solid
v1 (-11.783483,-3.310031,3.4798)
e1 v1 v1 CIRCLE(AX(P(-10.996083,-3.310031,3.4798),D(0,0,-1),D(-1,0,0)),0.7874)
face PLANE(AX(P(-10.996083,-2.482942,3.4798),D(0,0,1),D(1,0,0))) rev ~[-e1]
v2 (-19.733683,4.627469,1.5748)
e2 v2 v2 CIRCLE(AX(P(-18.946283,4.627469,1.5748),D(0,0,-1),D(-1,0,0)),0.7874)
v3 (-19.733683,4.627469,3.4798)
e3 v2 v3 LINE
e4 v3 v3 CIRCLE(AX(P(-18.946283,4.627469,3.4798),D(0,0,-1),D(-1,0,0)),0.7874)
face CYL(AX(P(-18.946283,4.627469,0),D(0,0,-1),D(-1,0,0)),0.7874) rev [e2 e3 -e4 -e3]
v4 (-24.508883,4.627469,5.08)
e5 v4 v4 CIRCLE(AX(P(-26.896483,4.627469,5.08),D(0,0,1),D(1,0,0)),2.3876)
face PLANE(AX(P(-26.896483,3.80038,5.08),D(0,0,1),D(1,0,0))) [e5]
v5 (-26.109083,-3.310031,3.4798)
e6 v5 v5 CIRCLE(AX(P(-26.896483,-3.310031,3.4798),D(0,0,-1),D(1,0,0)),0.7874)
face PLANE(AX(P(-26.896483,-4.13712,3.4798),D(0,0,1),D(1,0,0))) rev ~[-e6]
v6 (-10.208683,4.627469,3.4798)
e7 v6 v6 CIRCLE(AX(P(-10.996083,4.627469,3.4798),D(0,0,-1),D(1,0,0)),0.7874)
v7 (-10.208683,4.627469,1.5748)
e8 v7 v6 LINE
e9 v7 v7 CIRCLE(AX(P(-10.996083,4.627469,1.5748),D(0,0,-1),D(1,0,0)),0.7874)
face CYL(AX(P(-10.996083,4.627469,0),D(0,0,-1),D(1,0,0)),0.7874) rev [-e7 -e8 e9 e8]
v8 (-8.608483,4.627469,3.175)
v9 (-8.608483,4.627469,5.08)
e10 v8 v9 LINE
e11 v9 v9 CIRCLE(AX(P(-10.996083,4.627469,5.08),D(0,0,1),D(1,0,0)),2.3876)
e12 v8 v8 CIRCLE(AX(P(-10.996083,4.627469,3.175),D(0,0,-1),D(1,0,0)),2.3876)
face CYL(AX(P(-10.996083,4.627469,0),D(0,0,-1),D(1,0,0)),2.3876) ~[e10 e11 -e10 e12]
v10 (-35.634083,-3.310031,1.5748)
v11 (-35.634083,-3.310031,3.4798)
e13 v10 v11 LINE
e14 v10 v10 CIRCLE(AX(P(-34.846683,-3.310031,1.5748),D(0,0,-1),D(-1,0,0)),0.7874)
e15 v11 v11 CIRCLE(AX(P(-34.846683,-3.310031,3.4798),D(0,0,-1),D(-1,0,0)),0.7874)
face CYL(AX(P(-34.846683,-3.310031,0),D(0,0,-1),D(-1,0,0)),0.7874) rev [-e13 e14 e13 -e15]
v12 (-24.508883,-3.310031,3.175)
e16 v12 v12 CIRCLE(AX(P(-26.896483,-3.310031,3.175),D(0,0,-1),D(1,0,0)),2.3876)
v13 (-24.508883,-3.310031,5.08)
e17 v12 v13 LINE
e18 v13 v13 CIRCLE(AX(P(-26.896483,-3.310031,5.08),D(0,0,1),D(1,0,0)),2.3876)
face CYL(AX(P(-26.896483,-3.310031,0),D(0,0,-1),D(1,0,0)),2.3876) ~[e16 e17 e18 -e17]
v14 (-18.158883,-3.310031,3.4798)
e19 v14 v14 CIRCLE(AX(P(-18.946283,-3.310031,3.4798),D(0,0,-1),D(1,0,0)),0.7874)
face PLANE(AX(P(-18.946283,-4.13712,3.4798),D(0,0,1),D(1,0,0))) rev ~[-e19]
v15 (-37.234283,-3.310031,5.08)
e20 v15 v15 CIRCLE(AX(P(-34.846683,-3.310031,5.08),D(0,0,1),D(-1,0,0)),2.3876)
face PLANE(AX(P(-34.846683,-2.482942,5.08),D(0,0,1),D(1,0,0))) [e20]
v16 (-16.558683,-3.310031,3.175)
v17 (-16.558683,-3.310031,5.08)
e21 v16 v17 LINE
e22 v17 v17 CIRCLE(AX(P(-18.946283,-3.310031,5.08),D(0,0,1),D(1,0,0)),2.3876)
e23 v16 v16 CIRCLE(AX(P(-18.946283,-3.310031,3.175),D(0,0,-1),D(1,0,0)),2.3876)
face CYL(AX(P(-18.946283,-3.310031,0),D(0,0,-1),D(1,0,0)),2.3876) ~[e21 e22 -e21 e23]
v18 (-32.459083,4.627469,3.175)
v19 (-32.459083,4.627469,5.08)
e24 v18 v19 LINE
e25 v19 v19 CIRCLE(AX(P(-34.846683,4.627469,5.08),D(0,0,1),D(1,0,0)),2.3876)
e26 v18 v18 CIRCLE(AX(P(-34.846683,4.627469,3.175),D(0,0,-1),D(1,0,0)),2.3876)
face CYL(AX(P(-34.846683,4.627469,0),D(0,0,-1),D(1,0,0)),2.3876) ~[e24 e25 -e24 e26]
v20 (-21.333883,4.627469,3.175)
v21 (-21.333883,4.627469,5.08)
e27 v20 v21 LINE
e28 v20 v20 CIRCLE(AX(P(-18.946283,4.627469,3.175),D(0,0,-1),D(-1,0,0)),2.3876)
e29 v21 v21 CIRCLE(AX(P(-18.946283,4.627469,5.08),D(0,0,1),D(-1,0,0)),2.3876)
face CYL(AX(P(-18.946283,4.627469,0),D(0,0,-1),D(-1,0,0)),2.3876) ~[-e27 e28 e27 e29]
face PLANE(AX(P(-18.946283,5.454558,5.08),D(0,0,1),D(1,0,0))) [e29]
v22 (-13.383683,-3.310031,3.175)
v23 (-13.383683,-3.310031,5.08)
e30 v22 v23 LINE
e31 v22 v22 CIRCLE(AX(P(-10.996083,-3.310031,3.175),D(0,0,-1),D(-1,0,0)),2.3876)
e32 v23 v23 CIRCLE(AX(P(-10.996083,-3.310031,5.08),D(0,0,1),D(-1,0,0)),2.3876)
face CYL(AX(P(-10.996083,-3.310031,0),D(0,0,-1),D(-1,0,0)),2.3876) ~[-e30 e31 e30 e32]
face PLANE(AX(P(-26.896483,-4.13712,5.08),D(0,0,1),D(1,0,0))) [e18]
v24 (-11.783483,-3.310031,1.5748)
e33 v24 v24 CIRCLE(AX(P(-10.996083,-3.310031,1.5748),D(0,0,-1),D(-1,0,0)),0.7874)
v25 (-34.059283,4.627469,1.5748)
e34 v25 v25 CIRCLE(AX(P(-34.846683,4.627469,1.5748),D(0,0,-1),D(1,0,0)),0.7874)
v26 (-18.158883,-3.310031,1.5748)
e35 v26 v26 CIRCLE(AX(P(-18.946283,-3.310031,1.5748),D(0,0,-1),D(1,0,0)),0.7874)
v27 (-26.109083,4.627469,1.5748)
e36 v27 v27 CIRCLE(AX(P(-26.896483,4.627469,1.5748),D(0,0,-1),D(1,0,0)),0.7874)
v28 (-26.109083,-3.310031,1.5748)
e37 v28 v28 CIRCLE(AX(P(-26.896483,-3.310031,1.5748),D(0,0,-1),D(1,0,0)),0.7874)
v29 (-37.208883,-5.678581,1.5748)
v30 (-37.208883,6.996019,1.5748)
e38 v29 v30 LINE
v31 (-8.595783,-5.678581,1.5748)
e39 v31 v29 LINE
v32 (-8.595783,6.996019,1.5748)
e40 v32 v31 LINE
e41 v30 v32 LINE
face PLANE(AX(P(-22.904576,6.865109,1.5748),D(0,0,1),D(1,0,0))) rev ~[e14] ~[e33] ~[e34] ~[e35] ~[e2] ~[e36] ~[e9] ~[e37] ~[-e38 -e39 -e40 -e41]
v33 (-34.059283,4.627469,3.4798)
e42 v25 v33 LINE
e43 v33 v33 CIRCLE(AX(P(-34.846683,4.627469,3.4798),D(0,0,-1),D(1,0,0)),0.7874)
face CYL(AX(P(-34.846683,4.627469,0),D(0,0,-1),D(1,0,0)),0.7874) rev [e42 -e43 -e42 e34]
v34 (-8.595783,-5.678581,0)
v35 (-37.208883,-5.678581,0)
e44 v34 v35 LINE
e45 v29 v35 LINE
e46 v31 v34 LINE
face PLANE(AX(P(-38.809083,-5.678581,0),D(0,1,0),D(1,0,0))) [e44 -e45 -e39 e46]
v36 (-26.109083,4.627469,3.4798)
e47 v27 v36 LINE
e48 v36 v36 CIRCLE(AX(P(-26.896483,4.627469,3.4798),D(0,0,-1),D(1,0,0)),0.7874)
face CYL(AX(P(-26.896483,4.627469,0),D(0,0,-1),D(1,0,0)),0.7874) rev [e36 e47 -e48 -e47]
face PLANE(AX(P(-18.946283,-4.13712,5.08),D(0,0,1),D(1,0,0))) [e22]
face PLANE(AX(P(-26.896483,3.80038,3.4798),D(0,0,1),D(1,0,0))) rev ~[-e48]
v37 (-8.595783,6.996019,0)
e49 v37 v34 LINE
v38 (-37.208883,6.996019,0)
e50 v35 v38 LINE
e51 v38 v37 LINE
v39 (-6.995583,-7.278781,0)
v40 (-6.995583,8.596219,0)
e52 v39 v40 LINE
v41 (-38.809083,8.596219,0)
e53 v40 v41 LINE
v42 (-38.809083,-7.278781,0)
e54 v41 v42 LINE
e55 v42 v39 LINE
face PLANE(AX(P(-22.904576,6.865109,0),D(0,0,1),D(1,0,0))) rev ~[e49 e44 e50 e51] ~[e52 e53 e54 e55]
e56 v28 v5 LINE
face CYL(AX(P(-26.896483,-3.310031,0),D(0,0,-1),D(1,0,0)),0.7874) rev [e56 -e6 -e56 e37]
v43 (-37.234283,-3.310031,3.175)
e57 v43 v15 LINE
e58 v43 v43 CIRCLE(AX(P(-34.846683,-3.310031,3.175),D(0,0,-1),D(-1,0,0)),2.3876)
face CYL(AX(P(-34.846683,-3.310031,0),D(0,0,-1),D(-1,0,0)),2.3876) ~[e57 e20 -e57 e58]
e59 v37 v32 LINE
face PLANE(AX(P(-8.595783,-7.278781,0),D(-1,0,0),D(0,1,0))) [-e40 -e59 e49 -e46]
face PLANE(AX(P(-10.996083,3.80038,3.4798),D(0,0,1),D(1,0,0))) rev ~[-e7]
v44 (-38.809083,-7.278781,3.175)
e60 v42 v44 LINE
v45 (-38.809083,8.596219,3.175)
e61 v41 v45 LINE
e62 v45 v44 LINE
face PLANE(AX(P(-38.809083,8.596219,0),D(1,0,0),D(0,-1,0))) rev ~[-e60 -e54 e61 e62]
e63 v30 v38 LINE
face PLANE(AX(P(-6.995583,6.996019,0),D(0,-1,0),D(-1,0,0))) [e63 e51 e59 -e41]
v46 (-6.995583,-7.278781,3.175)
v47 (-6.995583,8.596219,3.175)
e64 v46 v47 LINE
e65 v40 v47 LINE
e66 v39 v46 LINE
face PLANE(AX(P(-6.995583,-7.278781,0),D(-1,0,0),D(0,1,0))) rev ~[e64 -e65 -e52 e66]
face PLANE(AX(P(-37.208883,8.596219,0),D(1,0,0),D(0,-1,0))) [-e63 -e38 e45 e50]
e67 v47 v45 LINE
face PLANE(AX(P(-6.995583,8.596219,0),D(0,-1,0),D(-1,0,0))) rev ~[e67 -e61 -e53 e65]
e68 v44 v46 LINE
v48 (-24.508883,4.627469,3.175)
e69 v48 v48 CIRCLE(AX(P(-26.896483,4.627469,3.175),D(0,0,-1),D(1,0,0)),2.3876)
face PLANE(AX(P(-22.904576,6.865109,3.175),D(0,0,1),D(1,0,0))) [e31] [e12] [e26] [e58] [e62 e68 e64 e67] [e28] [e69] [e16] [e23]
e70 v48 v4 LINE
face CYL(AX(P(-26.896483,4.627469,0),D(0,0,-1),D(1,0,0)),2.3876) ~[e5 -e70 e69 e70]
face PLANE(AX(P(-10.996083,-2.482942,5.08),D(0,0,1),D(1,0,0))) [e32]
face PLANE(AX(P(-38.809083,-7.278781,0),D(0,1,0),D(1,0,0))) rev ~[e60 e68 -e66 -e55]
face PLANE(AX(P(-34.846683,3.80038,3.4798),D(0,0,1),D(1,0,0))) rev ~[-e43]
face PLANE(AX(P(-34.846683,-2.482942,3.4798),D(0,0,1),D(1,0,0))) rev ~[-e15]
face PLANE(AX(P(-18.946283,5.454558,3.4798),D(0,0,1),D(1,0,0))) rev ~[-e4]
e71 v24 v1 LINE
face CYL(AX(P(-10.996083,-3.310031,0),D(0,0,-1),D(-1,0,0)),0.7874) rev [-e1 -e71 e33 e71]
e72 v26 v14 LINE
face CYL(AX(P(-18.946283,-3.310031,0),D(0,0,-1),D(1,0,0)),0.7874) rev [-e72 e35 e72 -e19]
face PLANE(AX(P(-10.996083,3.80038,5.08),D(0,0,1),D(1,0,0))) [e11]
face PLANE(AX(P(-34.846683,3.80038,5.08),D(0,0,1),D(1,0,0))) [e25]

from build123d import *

# Parameters (mm, degrees)
F1_DEPTH = 3.175
F2_DEPTH = 5.08
F3_T     = -1.6002


# Not quite as in the source:
# - a feature names something its author has since deleted; it is built from what else it names


with BuildPart() as f1:
    # F0 (on Top) → F1 (new body)
    with BuildSketch(Plane.XY):
        with BuildLine():
            Line((-6.9955831819, 8.5962191019), (-38.8090831819, 8.5962191019))
            Line((-38.8090831819, 8.5962191019), (-38.8090831819, 4.6274691019))
            Line((-38.8090831819, 4.6274691019), (-37.2342831819, 4.6274691019))
            ThreePointArc((-37.2342831819, 4.6274691019), (-34.8466831819, 7.0150691019), (-32.4590831819, 4.6274691019))
            Line((-32.4590831819, 4.6274691019), (-29.2840831819, 4.6274691019))
            ThreePointArc((-29.2840831819, 4.6274691019), (-26.8964831819, 7.0150691019), (-24.5088831819, 4.6274691019))
            Line((-24.5088831819, 4.6274691019), (-21.3338831819, 4.6274691019))
            ThreePointArc((-21.3338831819, 4.6274691019), (-18.9462831819, 7.0150691019), (-16.5586831819, 4.6274691019))
            Line((-16.5586831819, 4.6274691019), (-13.3836831819, 4.6274691019))
            ThreePointArc((-13.3836831819, 4.6274691019), (-10.9960831819, 7.0150691019), (-8.6084831819, 4.6274691019))
            Line((-8.6084831819, 4.6274691019), (-6.9955831819, 4.6274691019))
            Line((-6.9955831819, 4.6274691019), (-6.9955831819, 8.5962191019))
        make_face()
        with BuildLine():
            Line((-37.2342831819, 4.6274691019), (-38.8090831819, 4.6274691019))
            Line((-38.8090831819, 4.6274691019), (-38.8090831819, 0.6587191019))
            Line((-38.8090831819, 0.6587191019), (-6.9955831819, 0.6587191019))
            Line((-6.9955831819, 0.6587191019), (-6.9955831819, 4.6274691019))
            Line((-6.9955831819, 4.6274691019), (-8.6084831819, 4.6274691019))
            ThreePointArc((-8.6084831819, 4.6274691019), (-10.9960831819, 2.2398691019), (-13.3836831819, 4.6274691019))
            Line((-13.3836831819, 4.6274691019), (-16.5586831819, 4.6274691019))
            ThreePointArc((-16.5586831819, 4.6274691019), (-18.9462831819, 2.2398691019), (-21.3338831819, 4.6274691019))
            Line((-21.3338831819, 4.6274691019), (-24.5088831819, 4.6274691019))
            ThreePointArc((-24.5088831819, 4.6274691019), (-26.8964831819, 2.2398691019), (-29.2840831819, 4.6274691019))
            Line((-29.2840831819, 4.6274691019), (-32.4590831819, 4.6274691019))
            ThreePointArc((-32.4590831819, 4.6274691019), (-34.8466831819, 2.2398691019), (-37.2342831819, 4.6274691019))
        make_face()
        with BuildLine():
            Line((-37.2342831819, -3.3100308981), (-38.8090831819, -3.3100308981))
            Line((-38.8090831819, -3.3100308981), (-38.8090831819, -7.2787808981))
            Line((-38.8090831819, -7.2787808981), (-6.9955831819, -7.2787808981))
            Line((-6.9955831819, -7.2787808981), (-6.9955831819, -3.3100308981))
            Line((-6.9955831819, -3.3100308981), (-8.6084831819, -3.3100308981))
            ThreePointArc((-8.6084831819, -3.3100308981), (-10.9960831819, -5.6976308981), (-13.3836831819, -3.3100308981))
            Line((-13.3836831819, -3.3100308981), (-16.5586831819, -3.3100308981))
            ThreePointArc((-16.5586831819, -3.3100308981), (-18.9462831819, -5.6976308981), (-21.3338831819, -3.3100308981))
            Line((-21.3338831819, -3.3100308981), (-24.5088831819, -3.3100308981))
            ThreePointArc((-24.5088831819, -3.3100308981), (-26.8964831819, -5.6976308981), (-29.2840831819, -3.3100308981))
            Line((-29.2840831819, -3.3100308981), (-32.4590831819, -3.3100308981))
            ThreePointArc((-32.4590831819, -3.3100308981), (-34.8466831819, -5.6976308981), (-37.2342831819, -3.3100308981))
        make_face()
        with BuildLine():
            Line((-6.9955831819, 0.6587191019), (-38.8090831819, 0.6587191019))
            Line((-38.8090831819, 0.6587191019), (-38.8090831819, -3.3100308981))
            Line((-38.8090831819, -3.3100308981), (-37.2342831819, -3.3100308981))
            ThreePointArc((-37.2342831819, -3.3100308981), (-34.8466831819, -0.9224308981), (-32.4590831819, -3.3100308981))
            Line((-32.4590831819, -3.3100308981), (-29.2840831819, -3.3100308981))
            ThreePointArc((-29.2840831819, -3.3100308981), (-26.8964831819, -0.9224308981), (-24.5088831819, -3.3100308981))
            Line((-24.5088831819, -3.3100308981), (-21.3338831819, -3.3100308981))
            ThreePointArc((-21.3338831819, -3.3100308981), (-18.9462831819, -0.9224308981), (-16.5586831819, -3.3100308981))
            Line((-16.5586831819, -3.3100308981), (-13.3836831819, -3.3100308981))
            ThreePointArc((-13.3836831819, -3.3100308981), (-10.9960831819, -0.9224308981), (-8.6084831819, -3.3100308981))
            Line((-8.6084831819, -3.3100308981), (-6.9955831819, -3.3100308981))
            Line((-6.9955831819, -3.3100308981), (-6.9955831819, 0.6587191019))
        make_face()
    extrude(amount=F1_DEPTH)

    # F0 (on Top) → F2 (join)
    with BuildSketch(Plane.XY):
        with BuildLine():
            Line((-32.4590831819, 4.6274691019), (-37.2342831819, 4.6274691019))
            ThreePointArc((-37.2342831819, 4.6274691019), (-34.8466831819, 2.2398691019), (-32.4590831819, 4.6274691019))
        make_face()
        with BuildLine():
            ThreePointArc((-32.4590831819, 4.6274691019), (-34.8466831819, 7.0150691019), (-37.2342831819, 4.6274691019))
            Line((-37.2342831819, 4.6274691019), (-32.4590831819, 4.6274691019))
        make_face()
        with BuildLine():
            ThreePointArc((-32.4590831819, -3.3100308981), (-34.8466831819, -0.9224308981), (-37.2342831819, -3.3100308981))
            Line((-37.2342831819, -3.3100308981), (-32.4590831819, -3.3100308981))
        make_face()
        with BuildLine():
            Line((-32.4590831819, -3.3100308981), (-37.2342831819, -3.3100308981))
            ThreePointArc((-37.2342831819, -3.3100308981), (-34.8466831819, -5.6976308981), (-32.4590831819, -3.3100308981))
        make_face()
        with BuildLine():
            Line((-24.5088831819, -3.3100308981), (-29.2840831819, -3.3100308981))
            ThreePointArc((-29.2840831819, -3.3100308981), (-26.8964831819, -5.6976308981), (-24.5088831819, -3.3100308981))
        make_face()
        with BuildLine():
            ThreePointArc((-24.5088831819, -3.3100308981), (-26.8964831819, -0.9224308981), (-29.2840831819, -3.3100308981))
            Line((-29.2840831819, -3.3100308981), (-24.5088831819, -3.3100308981))
        make_face()
        with BuildLine():
            Line((-24.5088831819, 4.6274691019), (-29.2840831819, 4.6274691019))
            ThreePointArc((-29.2840831819, 4.6274691019), (-26.8964831819, 2.2398691019), (-24.5088831819, 4.6274691019))
        make_face()
        with BuildLine():
            ThreePointArc((-24.5088831819, 4.6274691019), (-26.8964831819, 7.0150691019), (-29.2840831819, 4.6274691019))
            Line((-29.2840831819, 4.6274691019), (-24.5088831819, 4.6274691019))
        make_face()
        with BuildLine():
            ThreePointArc((-21.3338831819, -3.3100308981), (-18.9462831819, -5.6976308981), (-16.5586831819, -3.3100308981))
            Line((-16.5586831819, -3.3100308981), (-21.3338831819, -3.3100308981))
        make_face()
        with BuildLine():
            Line((-21.3338831819, -3.3100308981), (-16.5586831819, -3.3100308981))
            ThreePointArc((-16.5586831819, -3.3100308981), (-18.9462831819, -0.9224308981), (-21.3338831819, -3.3100308981))
        make_face()
        with BuildLine():
            Line((-21.3338831819, 4.6274691019), (-16.5586831819, 4.6274691019))
            ThreePointArc((-16.5586831819, 4.6274691019), (-18.9462831819, 7.0150691019), (-21.3338831819, 4.6274691019))
        make_face()
        with BuildLine():
            ThreePointArc((-21.3338831819, 4.6274691019), (-18.9462831819, 2.2398691019), (-16.5586831819, 4.6274691019))
            Line((-16.5586831819, 4.6274691019), (-21.3338831819, 4.6274691019))
        make_face()
        with BuildLine():
            Line((-13.3836831819, -3.3100308981), (-8.6084831819, -3.3100308981))
            ThreePointArc((-8.6084831819, -3.3100308981), (-10.9960831819, -0.9224308981), (-13.3836831819, -3.3100308981))
        make_face()
        with BuildLine():
            ThreePointArc((-13.3836831819, -3.3100308981), (-10.9960831819, -5.6976308981), (-8.6084831819, -3.3100308981))
            Line((-8.6084831819, -3.3100308981), (-13.3836831819, -3.3100308981))
        make_face()
        with BuildLine():
            ThreePointArc((-13.3836831819, 4.6274691019), (-10.9960831819, 2.2398691019), (-8.6084831819, 4.6274691019))
            Line((-8.6084831819, 4.6274691019), (-13.3836831819, 4.6274691019))
        make_face()
        with BuildLine():
            Line((-13.3836831819, 4.6274691019), (-8.6084831819, 4.6274691019))
            ThreePointArc((-8.6084831819, 4.6274691019), (-10.9960831819, 7.0150691019), (-13.3836831819, 4.6274691019))
        make_face()
    extrude(amount=F2_DEPTH)

    # F3
    f3_openings = [f1.faces().sort_by_distance(p)[0] for p in [
        (-22.902333, 0.658719, 0),
    ]]
    offset(amount=F3_T, openings=f3_openings, kind=Kind.INTERSECTION)


solid = f1.part
